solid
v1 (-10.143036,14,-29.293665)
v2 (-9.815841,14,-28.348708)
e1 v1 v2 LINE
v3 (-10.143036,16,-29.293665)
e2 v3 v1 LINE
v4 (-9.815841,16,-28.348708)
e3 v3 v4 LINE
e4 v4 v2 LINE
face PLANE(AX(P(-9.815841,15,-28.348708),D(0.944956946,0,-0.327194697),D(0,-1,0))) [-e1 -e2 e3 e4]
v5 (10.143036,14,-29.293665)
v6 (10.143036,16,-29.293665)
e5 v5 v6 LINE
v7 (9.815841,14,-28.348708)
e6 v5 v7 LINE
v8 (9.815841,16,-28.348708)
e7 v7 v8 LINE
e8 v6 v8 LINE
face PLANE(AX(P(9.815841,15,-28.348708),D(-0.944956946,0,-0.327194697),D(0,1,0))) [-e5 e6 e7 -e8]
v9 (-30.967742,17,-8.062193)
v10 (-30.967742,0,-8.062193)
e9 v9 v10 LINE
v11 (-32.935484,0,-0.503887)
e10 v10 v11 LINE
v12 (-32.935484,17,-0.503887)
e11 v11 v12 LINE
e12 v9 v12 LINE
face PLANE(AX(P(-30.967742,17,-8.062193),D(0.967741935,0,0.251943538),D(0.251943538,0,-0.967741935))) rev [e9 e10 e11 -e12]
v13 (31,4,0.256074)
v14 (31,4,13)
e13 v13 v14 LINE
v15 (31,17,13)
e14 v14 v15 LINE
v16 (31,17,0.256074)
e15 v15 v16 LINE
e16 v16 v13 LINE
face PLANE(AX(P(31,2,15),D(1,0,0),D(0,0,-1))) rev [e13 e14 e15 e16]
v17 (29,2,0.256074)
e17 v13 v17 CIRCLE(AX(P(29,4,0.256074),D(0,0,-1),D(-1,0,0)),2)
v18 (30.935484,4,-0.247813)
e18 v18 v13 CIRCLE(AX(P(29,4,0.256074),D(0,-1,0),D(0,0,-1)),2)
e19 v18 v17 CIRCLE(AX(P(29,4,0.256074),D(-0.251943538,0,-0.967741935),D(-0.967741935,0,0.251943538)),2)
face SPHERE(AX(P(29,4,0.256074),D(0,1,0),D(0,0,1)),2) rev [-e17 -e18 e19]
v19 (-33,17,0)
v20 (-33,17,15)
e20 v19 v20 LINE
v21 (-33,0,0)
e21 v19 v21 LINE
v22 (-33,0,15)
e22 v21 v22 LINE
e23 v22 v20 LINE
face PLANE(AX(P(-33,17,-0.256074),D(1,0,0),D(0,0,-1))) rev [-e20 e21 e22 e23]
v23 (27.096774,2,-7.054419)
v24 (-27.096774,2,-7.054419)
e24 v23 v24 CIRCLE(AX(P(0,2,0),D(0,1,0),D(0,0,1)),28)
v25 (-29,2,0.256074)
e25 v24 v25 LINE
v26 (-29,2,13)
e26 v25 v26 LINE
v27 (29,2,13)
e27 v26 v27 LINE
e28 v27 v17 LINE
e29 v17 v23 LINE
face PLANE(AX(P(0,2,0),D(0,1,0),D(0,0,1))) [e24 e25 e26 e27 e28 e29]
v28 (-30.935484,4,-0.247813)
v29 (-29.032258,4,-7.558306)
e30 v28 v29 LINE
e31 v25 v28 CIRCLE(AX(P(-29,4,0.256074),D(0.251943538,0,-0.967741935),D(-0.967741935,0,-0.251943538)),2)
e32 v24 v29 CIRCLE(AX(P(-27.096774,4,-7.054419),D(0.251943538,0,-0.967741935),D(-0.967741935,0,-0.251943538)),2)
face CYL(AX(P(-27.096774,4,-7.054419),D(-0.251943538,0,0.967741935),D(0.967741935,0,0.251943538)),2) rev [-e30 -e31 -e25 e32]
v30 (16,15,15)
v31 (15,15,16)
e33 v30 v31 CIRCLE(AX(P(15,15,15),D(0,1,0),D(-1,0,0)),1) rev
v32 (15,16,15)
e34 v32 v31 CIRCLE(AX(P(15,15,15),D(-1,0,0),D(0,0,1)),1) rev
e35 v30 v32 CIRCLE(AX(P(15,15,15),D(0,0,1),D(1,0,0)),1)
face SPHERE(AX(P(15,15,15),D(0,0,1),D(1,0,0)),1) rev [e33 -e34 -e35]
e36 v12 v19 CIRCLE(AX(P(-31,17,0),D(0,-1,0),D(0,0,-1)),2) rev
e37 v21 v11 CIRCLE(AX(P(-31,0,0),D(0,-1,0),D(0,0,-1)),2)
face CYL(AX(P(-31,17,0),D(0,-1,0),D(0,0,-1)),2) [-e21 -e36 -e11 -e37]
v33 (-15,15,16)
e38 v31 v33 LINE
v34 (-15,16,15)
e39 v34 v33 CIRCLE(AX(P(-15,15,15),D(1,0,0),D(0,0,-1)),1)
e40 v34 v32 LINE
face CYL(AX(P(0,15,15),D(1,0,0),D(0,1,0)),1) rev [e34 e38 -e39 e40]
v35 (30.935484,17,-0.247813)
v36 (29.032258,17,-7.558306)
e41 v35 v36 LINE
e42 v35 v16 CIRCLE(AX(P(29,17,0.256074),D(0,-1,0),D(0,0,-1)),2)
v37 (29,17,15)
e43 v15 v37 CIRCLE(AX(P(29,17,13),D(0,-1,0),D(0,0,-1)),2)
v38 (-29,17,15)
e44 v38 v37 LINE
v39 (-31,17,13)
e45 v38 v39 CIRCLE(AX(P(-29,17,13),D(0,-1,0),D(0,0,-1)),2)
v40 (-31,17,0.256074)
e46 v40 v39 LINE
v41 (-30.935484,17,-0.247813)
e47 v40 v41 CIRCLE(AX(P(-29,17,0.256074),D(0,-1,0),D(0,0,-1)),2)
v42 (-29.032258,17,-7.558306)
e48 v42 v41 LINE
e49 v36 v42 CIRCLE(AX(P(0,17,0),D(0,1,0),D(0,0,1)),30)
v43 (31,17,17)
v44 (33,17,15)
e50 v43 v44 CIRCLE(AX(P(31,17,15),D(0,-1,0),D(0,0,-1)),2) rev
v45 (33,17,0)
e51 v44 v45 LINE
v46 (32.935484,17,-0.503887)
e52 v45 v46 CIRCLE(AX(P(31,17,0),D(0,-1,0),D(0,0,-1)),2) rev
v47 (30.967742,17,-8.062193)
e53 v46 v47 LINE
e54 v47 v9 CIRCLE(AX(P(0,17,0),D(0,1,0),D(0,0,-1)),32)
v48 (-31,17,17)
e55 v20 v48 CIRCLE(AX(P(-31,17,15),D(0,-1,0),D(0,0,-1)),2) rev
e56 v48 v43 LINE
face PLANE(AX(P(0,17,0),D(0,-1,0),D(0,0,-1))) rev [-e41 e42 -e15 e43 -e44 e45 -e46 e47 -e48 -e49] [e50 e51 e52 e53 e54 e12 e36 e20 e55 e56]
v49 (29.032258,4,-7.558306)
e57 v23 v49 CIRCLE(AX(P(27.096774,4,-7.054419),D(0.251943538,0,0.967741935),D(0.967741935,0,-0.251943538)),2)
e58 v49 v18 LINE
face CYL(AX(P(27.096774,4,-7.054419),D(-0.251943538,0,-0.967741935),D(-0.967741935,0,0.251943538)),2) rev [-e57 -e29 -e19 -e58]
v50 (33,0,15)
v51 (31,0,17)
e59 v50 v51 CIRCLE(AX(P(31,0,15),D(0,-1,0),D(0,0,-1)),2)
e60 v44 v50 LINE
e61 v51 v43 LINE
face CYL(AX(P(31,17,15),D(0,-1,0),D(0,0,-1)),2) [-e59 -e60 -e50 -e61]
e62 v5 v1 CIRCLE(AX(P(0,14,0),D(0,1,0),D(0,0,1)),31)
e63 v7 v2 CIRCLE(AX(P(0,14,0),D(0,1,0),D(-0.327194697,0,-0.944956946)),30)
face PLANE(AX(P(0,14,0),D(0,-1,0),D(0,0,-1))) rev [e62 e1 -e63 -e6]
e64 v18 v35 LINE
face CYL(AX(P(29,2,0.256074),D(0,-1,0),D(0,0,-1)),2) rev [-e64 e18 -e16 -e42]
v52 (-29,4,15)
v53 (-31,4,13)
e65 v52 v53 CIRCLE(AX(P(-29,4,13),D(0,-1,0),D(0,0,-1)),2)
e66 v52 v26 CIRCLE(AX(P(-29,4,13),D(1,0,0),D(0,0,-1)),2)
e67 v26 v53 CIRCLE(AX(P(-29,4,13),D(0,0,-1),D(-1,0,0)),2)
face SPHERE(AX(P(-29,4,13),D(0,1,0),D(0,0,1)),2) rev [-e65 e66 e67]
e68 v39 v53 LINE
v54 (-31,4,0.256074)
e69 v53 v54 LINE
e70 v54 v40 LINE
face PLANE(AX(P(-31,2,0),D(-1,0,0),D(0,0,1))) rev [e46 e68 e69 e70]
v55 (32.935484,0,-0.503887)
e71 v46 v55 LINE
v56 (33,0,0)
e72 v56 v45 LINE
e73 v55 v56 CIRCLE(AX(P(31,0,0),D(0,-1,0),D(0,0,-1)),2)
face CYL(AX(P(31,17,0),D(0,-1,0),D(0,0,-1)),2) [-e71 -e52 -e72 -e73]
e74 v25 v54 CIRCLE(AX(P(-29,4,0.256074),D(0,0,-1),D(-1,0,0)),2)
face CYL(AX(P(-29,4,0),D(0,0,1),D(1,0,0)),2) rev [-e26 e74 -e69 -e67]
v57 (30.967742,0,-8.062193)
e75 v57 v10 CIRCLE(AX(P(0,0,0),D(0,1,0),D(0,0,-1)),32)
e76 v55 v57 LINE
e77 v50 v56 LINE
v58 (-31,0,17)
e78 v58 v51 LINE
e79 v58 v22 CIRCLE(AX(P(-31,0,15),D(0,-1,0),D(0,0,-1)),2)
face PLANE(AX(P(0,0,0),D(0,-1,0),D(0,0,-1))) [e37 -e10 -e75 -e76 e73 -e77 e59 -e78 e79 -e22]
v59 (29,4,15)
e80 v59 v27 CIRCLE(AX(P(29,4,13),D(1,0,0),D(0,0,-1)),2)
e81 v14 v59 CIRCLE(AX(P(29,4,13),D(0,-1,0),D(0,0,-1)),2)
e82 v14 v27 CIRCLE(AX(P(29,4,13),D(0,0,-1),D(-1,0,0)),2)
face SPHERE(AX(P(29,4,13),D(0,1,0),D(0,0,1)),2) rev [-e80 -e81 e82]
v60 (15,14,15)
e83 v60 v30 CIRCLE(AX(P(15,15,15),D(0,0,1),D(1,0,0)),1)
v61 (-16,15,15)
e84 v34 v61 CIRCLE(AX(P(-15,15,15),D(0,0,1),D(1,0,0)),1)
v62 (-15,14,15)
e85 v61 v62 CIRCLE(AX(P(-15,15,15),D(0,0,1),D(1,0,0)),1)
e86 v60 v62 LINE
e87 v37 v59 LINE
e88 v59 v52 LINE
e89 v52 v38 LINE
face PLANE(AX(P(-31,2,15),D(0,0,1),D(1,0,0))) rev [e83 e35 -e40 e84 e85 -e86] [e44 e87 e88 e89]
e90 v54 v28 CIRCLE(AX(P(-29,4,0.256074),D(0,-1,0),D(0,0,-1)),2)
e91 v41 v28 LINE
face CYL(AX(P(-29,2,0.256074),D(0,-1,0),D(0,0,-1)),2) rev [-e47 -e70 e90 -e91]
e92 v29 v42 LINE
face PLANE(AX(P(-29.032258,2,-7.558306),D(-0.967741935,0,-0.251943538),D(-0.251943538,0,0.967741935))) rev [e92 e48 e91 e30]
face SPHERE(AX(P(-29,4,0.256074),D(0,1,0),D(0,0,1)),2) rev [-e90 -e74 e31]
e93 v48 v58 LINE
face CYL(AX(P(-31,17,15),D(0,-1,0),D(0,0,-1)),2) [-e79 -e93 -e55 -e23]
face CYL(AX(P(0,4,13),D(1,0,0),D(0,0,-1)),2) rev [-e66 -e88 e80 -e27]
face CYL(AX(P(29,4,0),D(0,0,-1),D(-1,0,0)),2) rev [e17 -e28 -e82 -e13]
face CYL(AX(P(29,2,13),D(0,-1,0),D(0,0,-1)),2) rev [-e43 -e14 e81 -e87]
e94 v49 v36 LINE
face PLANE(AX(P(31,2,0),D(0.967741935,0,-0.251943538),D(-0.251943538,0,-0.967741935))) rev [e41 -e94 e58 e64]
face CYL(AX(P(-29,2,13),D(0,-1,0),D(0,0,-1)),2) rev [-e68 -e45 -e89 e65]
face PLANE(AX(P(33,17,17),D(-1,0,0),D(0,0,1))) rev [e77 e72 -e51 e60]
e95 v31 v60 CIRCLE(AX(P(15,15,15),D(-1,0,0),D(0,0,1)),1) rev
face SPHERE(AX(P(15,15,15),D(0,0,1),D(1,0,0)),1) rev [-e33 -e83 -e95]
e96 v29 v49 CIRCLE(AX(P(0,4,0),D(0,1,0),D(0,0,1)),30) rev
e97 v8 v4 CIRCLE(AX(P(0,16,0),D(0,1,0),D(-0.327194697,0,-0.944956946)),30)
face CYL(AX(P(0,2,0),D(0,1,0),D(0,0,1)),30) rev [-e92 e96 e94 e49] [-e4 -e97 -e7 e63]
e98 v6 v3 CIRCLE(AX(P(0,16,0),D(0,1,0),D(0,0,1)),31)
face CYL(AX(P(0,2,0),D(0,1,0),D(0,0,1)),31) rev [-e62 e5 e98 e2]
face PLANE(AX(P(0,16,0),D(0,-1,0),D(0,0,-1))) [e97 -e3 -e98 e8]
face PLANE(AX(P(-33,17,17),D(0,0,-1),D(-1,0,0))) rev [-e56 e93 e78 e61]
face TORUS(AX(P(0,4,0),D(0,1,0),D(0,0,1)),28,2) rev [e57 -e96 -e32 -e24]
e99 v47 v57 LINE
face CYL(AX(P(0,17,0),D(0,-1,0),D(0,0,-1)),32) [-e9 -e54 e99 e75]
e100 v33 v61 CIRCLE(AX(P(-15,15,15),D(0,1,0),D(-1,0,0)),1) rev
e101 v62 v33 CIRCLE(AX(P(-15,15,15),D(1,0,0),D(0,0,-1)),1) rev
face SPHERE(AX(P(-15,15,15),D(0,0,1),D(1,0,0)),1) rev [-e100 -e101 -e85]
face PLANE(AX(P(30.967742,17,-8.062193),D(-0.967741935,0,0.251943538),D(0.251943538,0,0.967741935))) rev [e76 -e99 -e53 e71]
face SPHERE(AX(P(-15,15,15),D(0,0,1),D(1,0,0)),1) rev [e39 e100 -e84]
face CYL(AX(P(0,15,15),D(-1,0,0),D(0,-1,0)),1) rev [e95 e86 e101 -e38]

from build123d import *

# Parameters (mm, degrees)
BOSS_EXTRUDE1_DEPTH = 17
SKETCH4_OUTSIDE_W   = 84.788
SKETCH4_OUTSIDE_H   = 67.788
CUT_EXTRUDE1_DEPTH  = 15
FILLET4_R           = 2
FILLET5_R           = 2
SKETCH9_W           = 32
SKETCH9_H           = 2
CUT_EXTRUDE2_DEPTH  = 1
FILLET6_R           = 1
WRAP5_START         = 14
WRAP5_DEPTH         = 2


# Read off the part's stored shape, not the designer's step: Wrap5
with BuildPart() as part:
    # Sketch2 → Boss-Extrude1 (new body)
    with BuildSketch(Plane(origin=(0, 0, 0), x_dir=(1, 0, 0), z_dir=(0, 1, 0))):
        with BuildLine():
            Line((30.967741935, 8.062193214), (33, 0.25607376))
            Line((33, 0.25607376), (33, -17))
            Line((33, -17), (-33, -17))
            Line((-33, -17), (-33, 0.25607376))
            Line((-33, 0.25607376), (-30.967741935, 8.062193214))
            ThreePointArc((-30.967741935, 8.062193214), (0, 32), (30.967741935, 8.062193214))
        make_face()
    extrude(amount=BOSS_EXTRUDE1_DEPTH)

    # Sketch4 outside → Cut-Extrude1 (cut)
    # profile 1 of 2: a face of its own
    with BuildSketch(Plane(origin=(0, 17, 0), x_dir=(1, 0, 0), z_dir=(0, 1, 0))):
        with Locations((0, 7.5)):
            Rectangle(SKETCH4_OUTSIDE_W, SKETCH4_OUTSIDE_H)
        with BuildLine():
            Line((33, -17), (33, 0.25607376))
            Line((33, 0.25607376), (30.967741935, 8.062193214))
            ThreePointArc((30.967741935, 8.062193214), (0, 32), (-30.967741935, 8.062193214))
            Line((-30.967741935, 8.062193214), (-33, 0.25607376))
            Line((-33, 0.25607376), (-33, -17))
            Line((-33, -17), (33, -17))
        make_face(mode=Mode.SUBTRACT)
    # profile 2 of 2: a face of its own
    with BuildSketch(Plane(origin=(0, 17, 0), x_dir=(1, 0, 0), z_dir=(0, 1, 0))):
        with BuildLine():
            Line((-29.032258065, 7.558306138), (-31, 0))
            Line((-31, 0), (-31, -15))
            Line((-31, -15), (31, -15))
            Line((31, -15), (31, 0))
            Line((31, 0), (29.032258065, 7.558306138))
            ThreePointArc((29.032258065, 7.558306138), (0, 30), (-29.032258065, 7.558306138))
        make_face()
    extrude(amount=-CUT_EXTRUDE1_DEPTH, mode=Mode.SUBTRACT)

    # Fillet4
    fillet4_edges = [part.edges().sort_by_distance(p)[0] for p in [
        (33, 8.5, -0.25607376),
        (33, 8.5, 17),
        (-33, 8.5, 17),
        (-33, 8.5, -0.25607376),
        (31, 9.5, 0),
        (31, 9.5, 15),
        (-31, 9.5, 15),
        (-31, 9.5, 0),
    ]]
    fillet(fillet4_edges, radius=FILLET4_R)

    # Fillet5
    fillet5_edges = [part.edges().sort_by_distance(p)[0] for p in [
        (0, 2, -30),
        (-29.983870968, 2, -3.903059727),
        (0, 2, 15),
        (-31, 2, 6.62803688),
        (31, 2, 6.62803688),
        (29.983870968, 2, -3.903059727),
        (-30.983805401, 2, 0.002073506),
        (30.983805401, 2, 0.002073506),
        (30.414213562, 2, 14.414213562),
        (-30.414213562, 2, 14.414213562),
    ]]
    fillet(fillet5_edges, radius=FILLET5_R)

    # Sketch9 → Cut-Extrude2 (cut)
    with BuildSketch(Plane(origin=(0, 0, 15), x_dir=(-1, 0, 0), z_dir=(0, 0, -1))):
        with Locations((0, 15)):
            Rectangle(SKETCH9_W, SKETCH9_H)
    extrude(amount=-CUT_EXTRUDE2_DEPTH, mode=Mode.SUBTRACT)

    # Fillet6
    fillet6_edges = [part.edges().sort_by_distance(p)[0] for p in [
        (0, 16, 16),
    ]]
    fillet(fillet6_edges, radius=FILLET6_R - 0.0001)  # a hair under: the kernel refuses the full size
    fillet6_2_edges = [part.edges().sort_by_distance(p)[0] for p in [
        (-16, 14.50005, 16),
    ]]
    fillet(fillet6_2_edges, radius=FILLET6_R - 0.0001)  # a hair under: the kernel refuses the full size
    fillet6_3_edges = [part.edges().sort_by_distance(p)[0] for p in [
        (0.49995, 14, 16),
    ]]
    fillet(fillet6_3_edges, radius=FILLET6_R - 0.0001)  # a hair under: the kernel refuses the full size
    fillet6_4_edges = [part.edges().sort_by_distance(p)[0] for p in [
        (16, 15, 16),
    ]]
    fillet(fillet6_4_edges, radius=FILLET6_R - 0.0001)  # a hair under: the kernel refuses the full size

    # Wrap5 outline → Wrap5 (cut)
    with BuildSketch(Plane(origin=(0, 0, 0), x_dir=(1, 0, 0), z_dir=(0, 1, 0)).offset(WRAP5_START)):
        with BuildLine():
            Line((9.815840904, 28.348708389), (10.143035601, 29.293665336))
            ThreePointArc((10.143035601, 29.293665336), (0, 31), (-10.143035601, 29.293665336))
            Line((-10.143035601, 29.293665336), (-9.815840904, 28.348708389))
            ThreePointArc((-9.815840904, 28.348708389), (0, 30), (9.815840904, 28.348708389))
        make_face()
    extrude(amount=WRAP5_DEPTH, mode=Mode.SUBTRACT)


solid = part.part
